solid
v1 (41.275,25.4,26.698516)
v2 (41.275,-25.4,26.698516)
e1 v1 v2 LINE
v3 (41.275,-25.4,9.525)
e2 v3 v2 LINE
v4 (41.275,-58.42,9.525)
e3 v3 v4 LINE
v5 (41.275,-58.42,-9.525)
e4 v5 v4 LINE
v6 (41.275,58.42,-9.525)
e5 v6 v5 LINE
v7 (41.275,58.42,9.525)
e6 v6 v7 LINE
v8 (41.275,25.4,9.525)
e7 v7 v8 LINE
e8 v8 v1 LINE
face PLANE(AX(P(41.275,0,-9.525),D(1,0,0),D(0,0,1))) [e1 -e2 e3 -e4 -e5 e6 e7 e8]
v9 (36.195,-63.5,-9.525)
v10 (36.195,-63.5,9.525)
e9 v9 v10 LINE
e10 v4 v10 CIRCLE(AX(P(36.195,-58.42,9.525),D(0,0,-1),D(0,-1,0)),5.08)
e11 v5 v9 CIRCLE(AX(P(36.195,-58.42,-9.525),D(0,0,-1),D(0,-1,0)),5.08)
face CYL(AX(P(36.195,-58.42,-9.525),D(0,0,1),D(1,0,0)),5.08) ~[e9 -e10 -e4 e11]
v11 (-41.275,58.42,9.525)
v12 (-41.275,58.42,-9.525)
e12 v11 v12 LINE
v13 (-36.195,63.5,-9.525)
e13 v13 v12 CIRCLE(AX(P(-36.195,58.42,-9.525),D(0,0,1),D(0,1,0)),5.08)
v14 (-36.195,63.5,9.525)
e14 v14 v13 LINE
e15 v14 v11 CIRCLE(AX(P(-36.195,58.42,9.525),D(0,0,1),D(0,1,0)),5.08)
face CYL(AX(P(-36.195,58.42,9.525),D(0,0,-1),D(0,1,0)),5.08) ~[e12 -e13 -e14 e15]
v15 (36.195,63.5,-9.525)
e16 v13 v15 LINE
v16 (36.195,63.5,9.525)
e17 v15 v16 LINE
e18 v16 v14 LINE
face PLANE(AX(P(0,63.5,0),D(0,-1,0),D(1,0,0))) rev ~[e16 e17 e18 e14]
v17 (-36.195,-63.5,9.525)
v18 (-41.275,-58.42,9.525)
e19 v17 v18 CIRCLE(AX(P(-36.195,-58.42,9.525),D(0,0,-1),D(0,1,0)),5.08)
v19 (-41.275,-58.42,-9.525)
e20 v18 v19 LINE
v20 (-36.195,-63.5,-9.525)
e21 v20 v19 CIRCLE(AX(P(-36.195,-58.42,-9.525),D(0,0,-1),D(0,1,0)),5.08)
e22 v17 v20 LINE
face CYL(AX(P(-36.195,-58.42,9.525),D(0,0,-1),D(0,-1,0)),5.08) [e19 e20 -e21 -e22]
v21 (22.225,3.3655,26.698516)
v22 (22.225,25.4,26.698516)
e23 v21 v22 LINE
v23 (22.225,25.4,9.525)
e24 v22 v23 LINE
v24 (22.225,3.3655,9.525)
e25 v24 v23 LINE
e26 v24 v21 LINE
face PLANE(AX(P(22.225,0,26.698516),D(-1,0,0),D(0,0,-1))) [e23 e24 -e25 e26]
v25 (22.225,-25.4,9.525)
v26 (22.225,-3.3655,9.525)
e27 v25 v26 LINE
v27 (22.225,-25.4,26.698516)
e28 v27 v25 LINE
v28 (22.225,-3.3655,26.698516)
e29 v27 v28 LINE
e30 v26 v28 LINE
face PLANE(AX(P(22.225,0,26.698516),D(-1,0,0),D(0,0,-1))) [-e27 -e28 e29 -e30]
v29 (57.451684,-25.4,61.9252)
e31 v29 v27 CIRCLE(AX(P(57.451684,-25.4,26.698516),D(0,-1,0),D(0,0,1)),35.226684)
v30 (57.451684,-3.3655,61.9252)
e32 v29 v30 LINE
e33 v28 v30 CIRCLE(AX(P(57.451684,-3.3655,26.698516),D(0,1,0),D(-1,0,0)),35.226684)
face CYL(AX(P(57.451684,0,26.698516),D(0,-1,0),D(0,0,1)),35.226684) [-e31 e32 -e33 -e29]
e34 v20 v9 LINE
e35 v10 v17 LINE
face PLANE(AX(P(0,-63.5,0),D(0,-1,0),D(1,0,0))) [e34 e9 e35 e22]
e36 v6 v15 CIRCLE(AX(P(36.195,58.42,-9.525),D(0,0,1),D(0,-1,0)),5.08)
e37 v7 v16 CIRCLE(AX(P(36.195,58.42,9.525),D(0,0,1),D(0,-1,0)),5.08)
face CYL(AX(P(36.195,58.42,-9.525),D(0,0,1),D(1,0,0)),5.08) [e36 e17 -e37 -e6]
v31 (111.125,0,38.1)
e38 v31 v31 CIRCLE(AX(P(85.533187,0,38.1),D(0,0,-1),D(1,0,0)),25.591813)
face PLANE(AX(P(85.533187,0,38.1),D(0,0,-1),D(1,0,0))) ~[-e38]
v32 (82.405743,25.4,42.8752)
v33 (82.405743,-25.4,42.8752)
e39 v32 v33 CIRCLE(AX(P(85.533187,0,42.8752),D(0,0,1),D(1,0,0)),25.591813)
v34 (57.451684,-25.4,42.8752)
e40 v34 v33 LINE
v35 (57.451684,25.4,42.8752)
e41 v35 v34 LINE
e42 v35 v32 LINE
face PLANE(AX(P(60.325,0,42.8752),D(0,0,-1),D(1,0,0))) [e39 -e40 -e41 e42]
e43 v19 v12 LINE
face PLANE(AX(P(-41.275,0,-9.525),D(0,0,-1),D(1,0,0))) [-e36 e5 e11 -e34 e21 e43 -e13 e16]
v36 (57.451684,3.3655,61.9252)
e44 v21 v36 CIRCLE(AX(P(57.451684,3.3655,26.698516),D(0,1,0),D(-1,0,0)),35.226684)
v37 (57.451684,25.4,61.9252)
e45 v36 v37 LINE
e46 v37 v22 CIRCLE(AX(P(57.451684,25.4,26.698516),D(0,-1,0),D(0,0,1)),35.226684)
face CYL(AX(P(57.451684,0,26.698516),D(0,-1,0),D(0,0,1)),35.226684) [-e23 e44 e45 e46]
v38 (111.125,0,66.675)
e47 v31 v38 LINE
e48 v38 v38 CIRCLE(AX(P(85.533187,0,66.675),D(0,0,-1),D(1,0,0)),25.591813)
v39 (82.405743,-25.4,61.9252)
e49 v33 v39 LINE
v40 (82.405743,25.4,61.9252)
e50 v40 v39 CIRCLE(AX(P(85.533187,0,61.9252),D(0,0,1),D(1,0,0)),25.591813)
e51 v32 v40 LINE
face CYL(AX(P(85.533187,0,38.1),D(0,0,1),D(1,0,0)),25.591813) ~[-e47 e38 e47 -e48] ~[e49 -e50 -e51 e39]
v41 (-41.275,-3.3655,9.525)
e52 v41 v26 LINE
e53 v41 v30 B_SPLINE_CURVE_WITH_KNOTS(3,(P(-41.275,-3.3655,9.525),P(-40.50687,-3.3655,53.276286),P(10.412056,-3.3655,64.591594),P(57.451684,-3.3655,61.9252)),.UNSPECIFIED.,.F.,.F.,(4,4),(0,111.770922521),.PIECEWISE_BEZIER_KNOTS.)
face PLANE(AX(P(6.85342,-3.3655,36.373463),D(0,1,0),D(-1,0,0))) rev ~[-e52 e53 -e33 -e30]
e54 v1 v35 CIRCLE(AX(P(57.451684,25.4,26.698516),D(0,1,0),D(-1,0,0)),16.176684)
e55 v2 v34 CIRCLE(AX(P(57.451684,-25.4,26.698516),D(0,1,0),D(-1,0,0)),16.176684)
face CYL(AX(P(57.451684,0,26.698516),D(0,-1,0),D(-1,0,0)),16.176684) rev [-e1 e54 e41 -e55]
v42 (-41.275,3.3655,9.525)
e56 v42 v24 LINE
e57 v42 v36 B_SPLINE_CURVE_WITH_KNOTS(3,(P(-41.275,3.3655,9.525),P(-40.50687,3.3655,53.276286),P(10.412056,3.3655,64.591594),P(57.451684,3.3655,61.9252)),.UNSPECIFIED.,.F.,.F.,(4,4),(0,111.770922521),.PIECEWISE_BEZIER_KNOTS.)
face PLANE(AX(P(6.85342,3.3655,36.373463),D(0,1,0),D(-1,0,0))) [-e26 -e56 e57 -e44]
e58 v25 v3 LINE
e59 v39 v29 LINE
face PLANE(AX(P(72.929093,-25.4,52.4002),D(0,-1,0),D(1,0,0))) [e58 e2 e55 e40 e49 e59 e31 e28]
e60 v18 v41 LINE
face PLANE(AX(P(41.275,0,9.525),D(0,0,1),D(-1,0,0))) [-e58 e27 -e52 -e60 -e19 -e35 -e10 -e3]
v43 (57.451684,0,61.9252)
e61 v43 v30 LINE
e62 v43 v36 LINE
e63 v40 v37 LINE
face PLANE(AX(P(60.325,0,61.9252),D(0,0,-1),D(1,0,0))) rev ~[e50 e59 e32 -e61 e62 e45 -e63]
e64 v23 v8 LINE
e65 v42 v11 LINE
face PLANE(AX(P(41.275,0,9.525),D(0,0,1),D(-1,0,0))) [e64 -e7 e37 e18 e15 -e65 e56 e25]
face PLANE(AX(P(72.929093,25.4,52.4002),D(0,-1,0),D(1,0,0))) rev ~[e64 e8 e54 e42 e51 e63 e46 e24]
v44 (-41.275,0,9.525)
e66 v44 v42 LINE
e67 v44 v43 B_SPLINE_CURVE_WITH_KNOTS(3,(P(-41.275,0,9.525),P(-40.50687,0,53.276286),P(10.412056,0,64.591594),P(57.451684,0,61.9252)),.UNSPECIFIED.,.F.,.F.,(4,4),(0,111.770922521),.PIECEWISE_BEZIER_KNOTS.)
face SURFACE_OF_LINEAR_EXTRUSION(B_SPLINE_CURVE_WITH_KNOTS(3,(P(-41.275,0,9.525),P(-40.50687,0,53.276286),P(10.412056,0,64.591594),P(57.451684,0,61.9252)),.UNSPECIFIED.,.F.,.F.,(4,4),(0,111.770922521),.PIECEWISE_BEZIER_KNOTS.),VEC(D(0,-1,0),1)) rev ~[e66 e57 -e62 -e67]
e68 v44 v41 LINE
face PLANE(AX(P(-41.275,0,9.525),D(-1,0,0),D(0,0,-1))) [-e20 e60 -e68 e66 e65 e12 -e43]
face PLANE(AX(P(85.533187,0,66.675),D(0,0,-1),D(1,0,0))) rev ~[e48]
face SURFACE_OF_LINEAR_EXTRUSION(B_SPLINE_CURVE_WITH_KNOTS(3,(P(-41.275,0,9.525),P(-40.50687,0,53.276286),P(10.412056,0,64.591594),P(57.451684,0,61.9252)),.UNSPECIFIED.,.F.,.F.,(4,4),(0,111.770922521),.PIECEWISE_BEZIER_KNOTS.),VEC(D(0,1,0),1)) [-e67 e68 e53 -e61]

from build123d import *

# Parameters (mm, degrees)
F1_DEPTH = 63.5
F2_DEPTH = 25.4
F3_DEPTH = 3.3655
F0_W     = 25.2081867933
F0_H     = 19.05
F4_DEPTH = 25.4
F6_R     = 5.08


# Not quite as in the source:
# - a feature names something its author has since deleted; it is built from what else it names


with BuildPart() as f1:
    # F0 (on Front) → F1 (new body, symmetric)
    with BuildSketch(Plane.XZ):
        Polygon((-41.275, -9.525), (41.275, -9.525), (41.275, 9.525), (22.225, 9.525), (-41.275, 9.525), align=None)
    extrude(amount=F1_DEPTH, both=True)

    # F0 (on Front) → F2 (join, symmetric)
    with BuildSketch(Plane.XZ):
        with BuildLine():
            Line((22.225, 9.525), (41.275, 9.525))
            Line((41.275, 9.525), (41.275, 26.6985158606))
            ThreePointArc((41.275, 26.6985158606), (46.0130410873, 38.1371589127), (57.4516841394, 42.8752))
            Line((57.4516841394, 42.8752), (60.325, 42.8752))
            Line((60.325, 42.8752), (60.325, 61.9252))
            Line((60.325, 61.9252), (57.4516841394, 61.9252))
            ThreePointArc((57.4516841394, 61.9252), (32.5426569057, 51.6075430943), (22.225, 26.6985158606))
            Line((22.225, 26.6985158606), (22.225, 9.525))
        make_face()
    extrude(amount=F2_DEPTH, both=True)

    # F0 (on Front) → F3 (join, symmetric)
    with BuildSketch(Plane.XZ):
        with BuildLine():
            add(Edge.make_bspline(
                [(-41.275, 9.525), (-40.5068695545, 53.2762855291), (10.412055999, 64.5915940404), (57.4516841394, 61.9252)],
                knots=[0, 0, 0, 0, 111.7709225211, 111.7709225211, 111.7709225211, 111.7709225211], degree=3))
            Line((-41.275, 9.525), (22.225, 9.525))
            Line((22.225, 9.525), (22.225, 26.6985158606))
            ThreePointArc((22.225, 26.6985158606), (32.5426569057, 51.6075430943), (57.4516841394, 61.9252))
        make_face()
    extrude(amount=F3_DEPTH, both=True)

    # F0 (on Front) → F4 (join, symmetric)
    with BuildSketch(Plane.XZ):
        with Locations((72.9290933967, 52.4002)):
            Rectangle(F0_W, F0_H)
    extrude(amount=F4_DEPTH, both=True)

    # F0 (on Front) → F5 (revolve)
    with BuildSketch(Plane.XZ):
        Polygon((85.5331867933, 66.675), (85.5331867933, 61.9252), (85.5331867933, 42.8752), (85.5331867933, 38.1), (111.125, 38.1), (111.125, 66.675), align=None)
    revolve(axis=Axis((85.5331867933, 0, 52.3875), (0, 0, -1)))

    # F6
    f6_edges = [f1.edges().sort_by_distance(p)[0] for p in [
        (41.275, -63.5, 0),
        (-41.275, -63.5, 0),
        (41.275, 63.5, 0),
        (-41.275, 63.5, 0),
    ]]
    fillet(f6_edges, radius=F6_R)


solid = f1.part
